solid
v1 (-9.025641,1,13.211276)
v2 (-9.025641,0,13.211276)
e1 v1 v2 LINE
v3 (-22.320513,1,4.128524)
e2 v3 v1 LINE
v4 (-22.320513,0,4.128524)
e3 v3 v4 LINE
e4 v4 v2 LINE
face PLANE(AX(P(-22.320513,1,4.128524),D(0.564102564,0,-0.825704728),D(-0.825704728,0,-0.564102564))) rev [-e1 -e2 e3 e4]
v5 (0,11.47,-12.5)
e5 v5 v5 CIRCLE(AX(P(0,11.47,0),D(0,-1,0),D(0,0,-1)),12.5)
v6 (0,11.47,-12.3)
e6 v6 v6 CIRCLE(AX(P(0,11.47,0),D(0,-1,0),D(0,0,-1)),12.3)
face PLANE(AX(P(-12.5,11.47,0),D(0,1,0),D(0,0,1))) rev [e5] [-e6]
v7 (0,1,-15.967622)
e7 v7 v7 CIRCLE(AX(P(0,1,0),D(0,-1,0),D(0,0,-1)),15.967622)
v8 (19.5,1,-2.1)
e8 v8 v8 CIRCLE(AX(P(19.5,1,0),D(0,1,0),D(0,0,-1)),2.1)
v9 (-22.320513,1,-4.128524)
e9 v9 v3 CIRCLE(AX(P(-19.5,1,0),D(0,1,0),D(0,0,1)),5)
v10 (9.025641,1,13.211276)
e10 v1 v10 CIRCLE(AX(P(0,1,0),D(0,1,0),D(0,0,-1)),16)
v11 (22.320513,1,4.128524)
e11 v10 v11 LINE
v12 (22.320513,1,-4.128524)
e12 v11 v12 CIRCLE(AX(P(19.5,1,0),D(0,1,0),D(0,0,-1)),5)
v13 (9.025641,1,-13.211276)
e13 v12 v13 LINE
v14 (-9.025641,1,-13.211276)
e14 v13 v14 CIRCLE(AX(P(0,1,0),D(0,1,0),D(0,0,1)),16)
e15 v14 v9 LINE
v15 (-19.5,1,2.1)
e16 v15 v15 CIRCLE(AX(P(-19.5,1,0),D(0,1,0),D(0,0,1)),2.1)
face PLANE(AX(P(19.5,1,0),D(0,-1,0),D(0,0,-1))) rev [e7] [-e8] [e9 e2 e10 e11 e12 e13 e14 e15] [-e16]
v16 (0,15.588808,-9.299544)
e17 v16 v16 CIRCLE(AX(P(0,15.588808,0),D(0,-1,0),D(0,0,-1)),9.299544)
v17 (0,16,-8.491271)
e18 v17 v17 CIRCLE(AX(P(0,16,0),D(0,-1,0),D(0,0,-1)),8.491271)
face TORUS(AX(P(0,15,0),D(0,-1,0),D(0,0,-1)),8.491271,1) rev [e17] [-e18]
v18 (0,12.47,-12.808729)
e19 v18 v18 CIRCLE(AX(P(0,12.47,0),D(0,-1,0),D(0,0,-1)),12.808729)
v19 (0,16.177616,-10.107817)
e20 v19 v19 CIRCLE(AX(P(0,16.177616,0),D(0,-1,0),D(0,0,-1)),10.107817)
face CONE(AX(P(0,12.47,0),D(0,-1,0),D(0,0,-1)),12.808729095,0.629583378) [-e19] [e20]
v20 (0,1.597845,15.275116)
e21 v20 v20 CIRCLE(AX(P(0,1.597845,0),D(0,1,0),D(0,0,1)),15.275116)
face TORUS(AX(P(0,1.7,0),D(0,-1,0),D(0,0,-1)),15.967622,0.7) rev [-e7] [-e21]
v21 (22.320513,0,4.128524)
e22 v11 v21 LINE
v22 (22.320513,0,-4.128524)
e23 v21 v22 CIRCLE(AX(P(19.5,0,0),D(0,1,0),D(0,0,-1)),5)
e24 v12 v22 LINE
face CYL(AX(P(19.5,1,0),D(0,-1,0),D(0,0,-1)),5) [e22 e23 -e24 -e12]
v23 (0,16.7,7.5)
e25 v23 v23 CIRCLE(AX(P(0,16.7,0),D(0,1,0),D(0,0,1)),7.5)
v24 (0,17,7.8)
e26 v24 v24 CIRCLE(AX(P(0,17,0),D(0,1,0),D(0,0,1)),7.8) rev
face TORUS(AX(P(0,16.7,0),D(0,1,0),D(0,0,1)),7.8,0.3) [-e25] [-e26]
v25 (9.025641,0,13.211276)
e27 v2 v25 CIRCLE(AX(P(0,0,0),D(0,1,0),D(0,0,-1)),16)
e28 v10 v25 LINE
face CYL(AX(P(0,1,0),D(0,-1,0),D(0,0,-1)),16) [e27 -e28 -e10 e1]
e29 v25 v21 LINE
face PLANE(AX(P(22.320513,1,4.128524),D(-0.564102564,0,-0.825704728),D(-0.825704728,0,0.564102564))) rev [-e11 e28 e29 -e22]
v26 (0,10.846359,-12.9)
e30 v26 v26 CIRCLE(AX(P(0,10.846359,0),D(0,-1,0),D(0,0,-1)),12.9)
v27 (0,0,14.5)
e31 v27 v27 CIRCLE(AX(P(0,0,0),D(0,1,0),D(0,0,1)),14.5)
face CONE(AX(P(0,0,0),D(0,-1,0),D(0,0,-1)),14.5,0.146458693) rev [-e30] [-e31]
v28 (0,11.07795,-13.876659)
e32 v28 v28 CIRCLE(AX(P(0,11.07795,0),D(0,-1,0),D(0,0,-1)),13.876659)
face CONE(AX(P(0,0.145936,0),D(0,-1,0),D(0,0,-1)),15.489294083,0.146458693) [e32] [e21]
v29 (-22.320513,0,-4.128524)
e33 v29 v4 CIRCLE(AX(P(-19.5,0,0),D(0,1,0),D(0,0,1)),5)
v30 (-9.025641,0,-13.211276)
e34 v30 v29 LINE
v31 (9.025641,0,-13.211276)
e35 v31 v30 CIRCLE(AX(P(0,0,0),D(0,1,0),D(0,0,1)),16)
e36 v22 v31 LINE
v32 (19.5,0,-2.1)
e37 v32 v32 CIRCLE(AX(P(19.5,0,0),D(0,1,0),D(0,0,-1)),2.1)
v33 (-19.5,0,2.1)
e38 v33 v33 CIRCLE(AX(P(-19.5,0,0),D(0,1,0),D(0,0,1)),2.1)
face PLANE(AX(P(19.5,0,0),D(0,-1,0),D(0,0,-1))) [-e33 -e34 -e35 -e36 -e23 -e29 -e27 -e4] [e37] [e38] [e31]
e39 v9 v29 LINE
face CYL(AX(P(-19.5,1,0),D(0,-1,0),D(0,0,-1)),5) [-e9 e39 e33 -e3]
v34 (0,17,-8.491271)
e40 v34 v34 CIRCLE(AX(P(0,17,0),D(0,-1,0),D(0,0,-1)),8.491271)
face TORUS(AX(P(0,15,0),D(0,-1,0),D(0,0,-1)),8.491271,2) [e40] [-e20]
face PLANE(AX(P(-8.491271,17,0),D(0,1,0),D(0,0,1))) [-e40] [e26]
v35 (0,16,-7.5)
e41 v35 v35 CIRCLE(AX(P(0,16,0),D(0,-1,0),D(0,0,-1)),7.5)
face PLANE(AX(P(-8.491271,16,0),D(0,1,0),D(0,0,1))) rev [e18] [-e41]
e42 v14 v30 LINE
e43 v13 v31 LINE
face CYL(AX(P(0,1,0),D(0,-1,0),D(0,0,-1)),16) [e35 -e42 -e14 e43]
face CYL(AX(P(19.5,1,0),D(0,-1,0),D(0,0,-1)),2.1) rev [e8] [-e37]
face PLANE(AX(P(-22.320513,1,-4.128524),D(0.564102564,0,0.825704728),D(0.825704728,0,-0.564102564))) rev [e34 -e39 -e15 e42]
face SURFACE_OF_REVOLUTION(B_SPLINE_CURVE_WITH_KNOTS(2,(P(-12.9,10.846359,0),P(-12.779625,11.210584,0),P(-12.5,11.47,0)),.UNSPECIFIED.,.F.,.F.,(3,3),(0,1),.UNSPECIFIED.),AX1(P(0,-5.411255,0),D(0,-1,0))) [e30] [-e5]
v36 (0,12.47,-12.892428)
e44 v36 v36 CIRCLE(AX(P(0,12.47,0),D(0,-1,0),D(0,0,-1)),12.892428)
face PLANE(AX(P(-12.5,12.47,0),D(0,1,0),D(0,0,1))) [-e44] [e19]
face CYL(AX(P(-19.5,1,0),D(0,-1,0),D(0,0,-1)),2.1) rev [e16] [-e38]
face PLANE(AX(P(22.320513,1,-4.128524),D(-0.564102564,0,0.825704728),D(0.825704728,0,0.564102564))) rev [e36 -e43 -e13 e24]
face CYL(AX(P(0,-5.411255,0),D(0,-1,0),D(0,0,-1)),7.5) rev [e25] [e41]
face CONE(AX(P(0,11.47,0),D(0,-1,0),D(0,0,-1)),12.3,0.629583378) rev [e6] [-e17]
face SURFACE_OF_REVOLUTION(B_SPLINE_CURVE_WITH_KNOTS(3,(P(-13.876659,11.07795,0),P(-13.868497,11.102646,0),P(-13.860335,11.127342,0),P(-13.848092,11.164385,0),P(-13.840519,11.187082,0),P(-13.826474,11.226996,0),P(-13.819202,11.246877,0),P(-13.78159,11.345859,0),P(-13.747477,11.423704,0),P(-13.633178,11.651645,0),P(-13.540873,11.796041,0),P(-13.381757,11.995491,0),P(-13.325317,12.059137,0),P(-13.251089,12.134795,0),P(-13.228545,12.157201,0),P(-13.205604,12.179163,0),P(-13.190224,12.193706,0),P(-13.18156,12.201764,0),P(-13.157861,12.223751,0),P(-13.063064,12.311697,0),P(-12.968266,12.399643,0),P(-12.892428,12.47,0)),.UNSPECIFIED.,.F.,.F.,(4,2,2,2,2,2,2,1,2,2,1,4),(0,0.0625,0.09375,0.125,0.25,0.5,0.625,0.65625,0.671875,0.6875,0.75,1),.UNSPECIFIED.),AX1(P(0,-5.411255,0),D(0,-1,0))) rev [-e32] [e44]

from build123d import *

# Parameters (mm, degrees)
R_VOL_MINCE1_OUTLINE_W   = 0.007571627
R_VOL_MINCE1_OUTLINE_H   = 0.3920495
R_VOL_MINCE1_OUTLINE_W_2 = 0.976658528
R_VOL_MINCE1_OUTLINE_H_2 = 0.231591764
ESQUISSE2_R              = 2.1
ESQUISSE2_R_2            = 14.5
BOSS_EXTRU_1_DEPTH       = 1
CONG_1_R                 = 0.7
CONG_2_R                 = 0.3


# Read off the part's stored shape, not the designer's step: Révol.-Mince1
with BuildPart() as part:
    # Révol.-Mince1 outline → Révol.-Mince1 (revolve)
    with BuildSketch(Plane.XY):
        with BuildLine():
            Line((7.5, 17), (7.5, 16))
            Line((7.5, 16), (8.491270905, 16))
            ThreePointArc((8.491270905, 16), (8.94469782, 15.89129346), (9.299543794, 15.588808065))
            Line((9.299543794, 15.588808065), (11.571523179, 12.47))
            Line((11.571523179, 12.47), (12.5, 12.47))
            Line((12.5, 12.47), (12.5, 12.893800849))
            Line((12.5, 12.893800849), (10.107816683, 16.177616129))
            ThreePointArc((10.107816683, 16.177616129), (9.398124736, 16.782586921), (8.491270905, 17))
            Line((8.491270905, 17), (7.5, 17))
        make_face()
        Polygon((12.5, 12.47), (11.571523179, 12.47), (12.3, 11.47), (12.5, 11.47), align=None)
        Polygon((12.5, 12.893800849), (12.5, 12.47), (12.808729095, 12.47), align=None)
        Polygon((12.808729095, 12.47), (12.5, 12.47), (12.5, 11.47), (12.892428373, 11.47), (12.892428373, 12.47), align=None)
        with BuildLine():
            Line((12.892428373, 11.47), (12.5, 11.47))
            add(Edge.make_bspline(
                [(12.801834176, 11.0779505), (12.686238359, 11.297221706), (12.5, 11.47)],
                knots=[0.333971607, 0.333971607, 0.333971607, 1, 1, 1], degree=2))
            Line((12.801834176, 11.0779505), (12.892428373, 11.0779505))
            Line((12.892428373, 11.0779505), (12.892428373, 11.47))
        make_face()
        with BuildLine():
            add(Edge.make_bspline(
                [(12.9, 12.462975599), (12.897476124, 12.465317066), (12.894952248, 12.467658533), (12.892428373, 12.47)],
                knots=[0.991680034, 0.991680034, 0.991680034, 0.991680034, 1, 1, 1, 1], degree=3))
            Line((12.892428373, 12.47), (12.892428373, 11.47))
            Line((12.892428373, 11.47), (12.9, 11.47))
            Line((12.9, 11.47), (12.9, 12.462975599))
        make_face()
        with BuildLine():
            Line((12.892428373, 11.0779505), (12.801834176, 11.0779505))
            add(Edge.make_bspline(
                [(12.892428373, 10.868711363), (12.854448818, 10.978146923), (12.801834176, 11.0779505)],
                knots=[0.030821836, 0.030821836, 0.030821836, 0.333971607, 0.333971607, 0.333971607], degree=2))
            Line((12.892428373, 10.868711363), (12.892428373, 11.0779505))
        make_face()
        with Locations((12.896214186, 11.27397525)):
            Rectangle(R_VOL_MINCE1_OUTLINE_W, R_VOL_MINCE1_OUTLINE_H)
        with BuildLine():
            add(Edge.make_bspline(
                [(13.724014392, 11.47), (13.719202707, 11.479925565), (13.714323748, 11.489820846), (13.633178057, 11.651645326), (13.540873317, 11.796040705), (13.381756728, 11.995490826), (13.325317424, 12.059137243), (13.251089091, 12.134794608), (13.228544986, 12.15720053), (13.205604181, 12.179163391), (13.190224008, 12.19370632), (13.181560449, 12.201764459), (13.157861099, 12.223750978), (13.065587572, 12.309355591), (12.973314046, 12.394960203), (12.9, 12.462975599)],
                knots=[0.233772362, 0.233772362, 0.233772362, 0.233772362, 0.25, 0.25, 0.5, 0.5, 0.625, 0.625, 0.65625, 0.671875, 0.671875, 0.6875, 0.6875, 0.75, 0.991680034, 0.991680034, 0.991680034, 0.991680034], degree=3))
            Line((12.9, 12.462975599), (12.9, 11.47))
            Line((12.9, 11.47), (13.724014392, 11.47))
        make_face()
        with BuildLine():
            Line((12.892428373, 11.0779505), (12.892428373, 10.868711363))
            add(Edge.make_bspline(
                [(12.9, 10.846358736), (12.896289829, 10.857584833), (12.892428373, 10.868711363)],
                knots=[0, 0, 0, 0.030821836, 0.030821836, 0.030821836], degree=2))
            Line((12.9, 10.846358736), (12.9, 11.0779505))
            Line((12.9, 11.0779505), (12.892428373, 11.0779505))
        make_face()
        with BuildLine():
            Line((13.724014392, 11.47), (12.9, 11.47))
            Line((12.9, 11.47), (12.9, 11.0779505))
            Line((12.9, 11.0779505), (13.876658528, 11.0779505))
            add(Edge.make_bspline(
                [(13.876658528, 11.0779505), (13.868496738, 11.102646143), (13.860334948, 11.127341786), (13.848092262, 11.16438525), (13.840518996, 11.18708214), (13.82647434, 11.226996021), (13.819202463, 11.246876541), (13.785496409, 11.335579036), (13.756266672, 11.40346985), (13.724014392, 11.47)],
                knots=[0, 0, 0, 0, 0.0625, 0.0625, 0.09375, 0.09375, 0.125, 0.125, 0.233772362, 0.233772362, 0.233772362, 0.233772362], degree=3))
        make_face()
        Polygon((13.876658528, 10.846358736), (12.9, 10.846358736), (13.876658528, 4.225615763), align=None)
        with Locations((13.388329264, 10.962154618)):
            Rectangle(R_VOL_MINCE1_OUTLINE_W_2, R_VOL_MINCE1_OUTLINE_H_2)
        Polygon((13.910821774, 10.846358736), (13.876658528, 11.0779505), (13.876658528, 10.846358736), align=None)
        Polygon((13.876658528, 10.846358736), (13.876658528, 4.225615763), (14.5, 0), (15.489294083, 0.145935661), (13.910821774, 10.846358736), align=None)
    revolve(axis=Axis((0, 0, 0), (0, 1, 0)))

    # Esquisse2 → Boss.-Extru.1 (add)
    with BuildSketch(Plane(origin=(0, 0, 0), x_dir=(1, 0, 0), z_dir=(0, 1, 0))):
        with BuildLine():
            Line((-22.320512821, 4.128523638), (-9.025641026, 13.211275642))
            ThreePointArc((-9.025641026, 13.211275642), (0, 16), (9.025641026, 13.211275642))
            Line((9.025641026, 13.211275642), (22.320512821, 4.128523638))
            ThreePointArc((22.320512821, 4.128523638), (24.5, 0), (22.320512821, -4.128523638))
            Line((22.320512821, -4.128523638), (9.025641026, -13.211275642))
            ThreePointArc((9.025641026, -13.211275642), (0, -16), (-9.025641026, -13.211275642))
            Line((-9.025641026, -13.211275642), (-22.320512821, -4.128523638))
            ThreePointArc((-22.320512821, -4.128523638), (-24.5, 0), (-22.320512821, 4.128523638))
        make_face()
        with Locations(Location((-19.5, 0, 0), (0, 0, 270))):
            Circle(ESQUISSE2_R, mode=Mode.SUBTRACT)
        with Locations(Location((19.5, 0, 0), (0, 0, 90))):
            Circle(ESQUISSE2_R, mode=Mode.SUBTRACT)
        Circle(ESQUISSE2_R_2, mode=Mode.SUBTRACT)
    extrude(amount=BOSS_EXTRU_1_DEPTH)

    # Congé1
    cong_1_edges = [part.edges().sort_by_distance(p)[0] for p in [
        (-15.36330683, 1, 0),
    ]]
    fillet(cong_1_edges, radius=CONG_1_R)

    # Congé2
    cong_2_edges = [part.edges().sort_by_distance(p)[0] for p in [
        (-7.5, 17, 0),
    ]]
    fillet(cong_2_edges, radius=CONG_2_R)


solid = part.part
